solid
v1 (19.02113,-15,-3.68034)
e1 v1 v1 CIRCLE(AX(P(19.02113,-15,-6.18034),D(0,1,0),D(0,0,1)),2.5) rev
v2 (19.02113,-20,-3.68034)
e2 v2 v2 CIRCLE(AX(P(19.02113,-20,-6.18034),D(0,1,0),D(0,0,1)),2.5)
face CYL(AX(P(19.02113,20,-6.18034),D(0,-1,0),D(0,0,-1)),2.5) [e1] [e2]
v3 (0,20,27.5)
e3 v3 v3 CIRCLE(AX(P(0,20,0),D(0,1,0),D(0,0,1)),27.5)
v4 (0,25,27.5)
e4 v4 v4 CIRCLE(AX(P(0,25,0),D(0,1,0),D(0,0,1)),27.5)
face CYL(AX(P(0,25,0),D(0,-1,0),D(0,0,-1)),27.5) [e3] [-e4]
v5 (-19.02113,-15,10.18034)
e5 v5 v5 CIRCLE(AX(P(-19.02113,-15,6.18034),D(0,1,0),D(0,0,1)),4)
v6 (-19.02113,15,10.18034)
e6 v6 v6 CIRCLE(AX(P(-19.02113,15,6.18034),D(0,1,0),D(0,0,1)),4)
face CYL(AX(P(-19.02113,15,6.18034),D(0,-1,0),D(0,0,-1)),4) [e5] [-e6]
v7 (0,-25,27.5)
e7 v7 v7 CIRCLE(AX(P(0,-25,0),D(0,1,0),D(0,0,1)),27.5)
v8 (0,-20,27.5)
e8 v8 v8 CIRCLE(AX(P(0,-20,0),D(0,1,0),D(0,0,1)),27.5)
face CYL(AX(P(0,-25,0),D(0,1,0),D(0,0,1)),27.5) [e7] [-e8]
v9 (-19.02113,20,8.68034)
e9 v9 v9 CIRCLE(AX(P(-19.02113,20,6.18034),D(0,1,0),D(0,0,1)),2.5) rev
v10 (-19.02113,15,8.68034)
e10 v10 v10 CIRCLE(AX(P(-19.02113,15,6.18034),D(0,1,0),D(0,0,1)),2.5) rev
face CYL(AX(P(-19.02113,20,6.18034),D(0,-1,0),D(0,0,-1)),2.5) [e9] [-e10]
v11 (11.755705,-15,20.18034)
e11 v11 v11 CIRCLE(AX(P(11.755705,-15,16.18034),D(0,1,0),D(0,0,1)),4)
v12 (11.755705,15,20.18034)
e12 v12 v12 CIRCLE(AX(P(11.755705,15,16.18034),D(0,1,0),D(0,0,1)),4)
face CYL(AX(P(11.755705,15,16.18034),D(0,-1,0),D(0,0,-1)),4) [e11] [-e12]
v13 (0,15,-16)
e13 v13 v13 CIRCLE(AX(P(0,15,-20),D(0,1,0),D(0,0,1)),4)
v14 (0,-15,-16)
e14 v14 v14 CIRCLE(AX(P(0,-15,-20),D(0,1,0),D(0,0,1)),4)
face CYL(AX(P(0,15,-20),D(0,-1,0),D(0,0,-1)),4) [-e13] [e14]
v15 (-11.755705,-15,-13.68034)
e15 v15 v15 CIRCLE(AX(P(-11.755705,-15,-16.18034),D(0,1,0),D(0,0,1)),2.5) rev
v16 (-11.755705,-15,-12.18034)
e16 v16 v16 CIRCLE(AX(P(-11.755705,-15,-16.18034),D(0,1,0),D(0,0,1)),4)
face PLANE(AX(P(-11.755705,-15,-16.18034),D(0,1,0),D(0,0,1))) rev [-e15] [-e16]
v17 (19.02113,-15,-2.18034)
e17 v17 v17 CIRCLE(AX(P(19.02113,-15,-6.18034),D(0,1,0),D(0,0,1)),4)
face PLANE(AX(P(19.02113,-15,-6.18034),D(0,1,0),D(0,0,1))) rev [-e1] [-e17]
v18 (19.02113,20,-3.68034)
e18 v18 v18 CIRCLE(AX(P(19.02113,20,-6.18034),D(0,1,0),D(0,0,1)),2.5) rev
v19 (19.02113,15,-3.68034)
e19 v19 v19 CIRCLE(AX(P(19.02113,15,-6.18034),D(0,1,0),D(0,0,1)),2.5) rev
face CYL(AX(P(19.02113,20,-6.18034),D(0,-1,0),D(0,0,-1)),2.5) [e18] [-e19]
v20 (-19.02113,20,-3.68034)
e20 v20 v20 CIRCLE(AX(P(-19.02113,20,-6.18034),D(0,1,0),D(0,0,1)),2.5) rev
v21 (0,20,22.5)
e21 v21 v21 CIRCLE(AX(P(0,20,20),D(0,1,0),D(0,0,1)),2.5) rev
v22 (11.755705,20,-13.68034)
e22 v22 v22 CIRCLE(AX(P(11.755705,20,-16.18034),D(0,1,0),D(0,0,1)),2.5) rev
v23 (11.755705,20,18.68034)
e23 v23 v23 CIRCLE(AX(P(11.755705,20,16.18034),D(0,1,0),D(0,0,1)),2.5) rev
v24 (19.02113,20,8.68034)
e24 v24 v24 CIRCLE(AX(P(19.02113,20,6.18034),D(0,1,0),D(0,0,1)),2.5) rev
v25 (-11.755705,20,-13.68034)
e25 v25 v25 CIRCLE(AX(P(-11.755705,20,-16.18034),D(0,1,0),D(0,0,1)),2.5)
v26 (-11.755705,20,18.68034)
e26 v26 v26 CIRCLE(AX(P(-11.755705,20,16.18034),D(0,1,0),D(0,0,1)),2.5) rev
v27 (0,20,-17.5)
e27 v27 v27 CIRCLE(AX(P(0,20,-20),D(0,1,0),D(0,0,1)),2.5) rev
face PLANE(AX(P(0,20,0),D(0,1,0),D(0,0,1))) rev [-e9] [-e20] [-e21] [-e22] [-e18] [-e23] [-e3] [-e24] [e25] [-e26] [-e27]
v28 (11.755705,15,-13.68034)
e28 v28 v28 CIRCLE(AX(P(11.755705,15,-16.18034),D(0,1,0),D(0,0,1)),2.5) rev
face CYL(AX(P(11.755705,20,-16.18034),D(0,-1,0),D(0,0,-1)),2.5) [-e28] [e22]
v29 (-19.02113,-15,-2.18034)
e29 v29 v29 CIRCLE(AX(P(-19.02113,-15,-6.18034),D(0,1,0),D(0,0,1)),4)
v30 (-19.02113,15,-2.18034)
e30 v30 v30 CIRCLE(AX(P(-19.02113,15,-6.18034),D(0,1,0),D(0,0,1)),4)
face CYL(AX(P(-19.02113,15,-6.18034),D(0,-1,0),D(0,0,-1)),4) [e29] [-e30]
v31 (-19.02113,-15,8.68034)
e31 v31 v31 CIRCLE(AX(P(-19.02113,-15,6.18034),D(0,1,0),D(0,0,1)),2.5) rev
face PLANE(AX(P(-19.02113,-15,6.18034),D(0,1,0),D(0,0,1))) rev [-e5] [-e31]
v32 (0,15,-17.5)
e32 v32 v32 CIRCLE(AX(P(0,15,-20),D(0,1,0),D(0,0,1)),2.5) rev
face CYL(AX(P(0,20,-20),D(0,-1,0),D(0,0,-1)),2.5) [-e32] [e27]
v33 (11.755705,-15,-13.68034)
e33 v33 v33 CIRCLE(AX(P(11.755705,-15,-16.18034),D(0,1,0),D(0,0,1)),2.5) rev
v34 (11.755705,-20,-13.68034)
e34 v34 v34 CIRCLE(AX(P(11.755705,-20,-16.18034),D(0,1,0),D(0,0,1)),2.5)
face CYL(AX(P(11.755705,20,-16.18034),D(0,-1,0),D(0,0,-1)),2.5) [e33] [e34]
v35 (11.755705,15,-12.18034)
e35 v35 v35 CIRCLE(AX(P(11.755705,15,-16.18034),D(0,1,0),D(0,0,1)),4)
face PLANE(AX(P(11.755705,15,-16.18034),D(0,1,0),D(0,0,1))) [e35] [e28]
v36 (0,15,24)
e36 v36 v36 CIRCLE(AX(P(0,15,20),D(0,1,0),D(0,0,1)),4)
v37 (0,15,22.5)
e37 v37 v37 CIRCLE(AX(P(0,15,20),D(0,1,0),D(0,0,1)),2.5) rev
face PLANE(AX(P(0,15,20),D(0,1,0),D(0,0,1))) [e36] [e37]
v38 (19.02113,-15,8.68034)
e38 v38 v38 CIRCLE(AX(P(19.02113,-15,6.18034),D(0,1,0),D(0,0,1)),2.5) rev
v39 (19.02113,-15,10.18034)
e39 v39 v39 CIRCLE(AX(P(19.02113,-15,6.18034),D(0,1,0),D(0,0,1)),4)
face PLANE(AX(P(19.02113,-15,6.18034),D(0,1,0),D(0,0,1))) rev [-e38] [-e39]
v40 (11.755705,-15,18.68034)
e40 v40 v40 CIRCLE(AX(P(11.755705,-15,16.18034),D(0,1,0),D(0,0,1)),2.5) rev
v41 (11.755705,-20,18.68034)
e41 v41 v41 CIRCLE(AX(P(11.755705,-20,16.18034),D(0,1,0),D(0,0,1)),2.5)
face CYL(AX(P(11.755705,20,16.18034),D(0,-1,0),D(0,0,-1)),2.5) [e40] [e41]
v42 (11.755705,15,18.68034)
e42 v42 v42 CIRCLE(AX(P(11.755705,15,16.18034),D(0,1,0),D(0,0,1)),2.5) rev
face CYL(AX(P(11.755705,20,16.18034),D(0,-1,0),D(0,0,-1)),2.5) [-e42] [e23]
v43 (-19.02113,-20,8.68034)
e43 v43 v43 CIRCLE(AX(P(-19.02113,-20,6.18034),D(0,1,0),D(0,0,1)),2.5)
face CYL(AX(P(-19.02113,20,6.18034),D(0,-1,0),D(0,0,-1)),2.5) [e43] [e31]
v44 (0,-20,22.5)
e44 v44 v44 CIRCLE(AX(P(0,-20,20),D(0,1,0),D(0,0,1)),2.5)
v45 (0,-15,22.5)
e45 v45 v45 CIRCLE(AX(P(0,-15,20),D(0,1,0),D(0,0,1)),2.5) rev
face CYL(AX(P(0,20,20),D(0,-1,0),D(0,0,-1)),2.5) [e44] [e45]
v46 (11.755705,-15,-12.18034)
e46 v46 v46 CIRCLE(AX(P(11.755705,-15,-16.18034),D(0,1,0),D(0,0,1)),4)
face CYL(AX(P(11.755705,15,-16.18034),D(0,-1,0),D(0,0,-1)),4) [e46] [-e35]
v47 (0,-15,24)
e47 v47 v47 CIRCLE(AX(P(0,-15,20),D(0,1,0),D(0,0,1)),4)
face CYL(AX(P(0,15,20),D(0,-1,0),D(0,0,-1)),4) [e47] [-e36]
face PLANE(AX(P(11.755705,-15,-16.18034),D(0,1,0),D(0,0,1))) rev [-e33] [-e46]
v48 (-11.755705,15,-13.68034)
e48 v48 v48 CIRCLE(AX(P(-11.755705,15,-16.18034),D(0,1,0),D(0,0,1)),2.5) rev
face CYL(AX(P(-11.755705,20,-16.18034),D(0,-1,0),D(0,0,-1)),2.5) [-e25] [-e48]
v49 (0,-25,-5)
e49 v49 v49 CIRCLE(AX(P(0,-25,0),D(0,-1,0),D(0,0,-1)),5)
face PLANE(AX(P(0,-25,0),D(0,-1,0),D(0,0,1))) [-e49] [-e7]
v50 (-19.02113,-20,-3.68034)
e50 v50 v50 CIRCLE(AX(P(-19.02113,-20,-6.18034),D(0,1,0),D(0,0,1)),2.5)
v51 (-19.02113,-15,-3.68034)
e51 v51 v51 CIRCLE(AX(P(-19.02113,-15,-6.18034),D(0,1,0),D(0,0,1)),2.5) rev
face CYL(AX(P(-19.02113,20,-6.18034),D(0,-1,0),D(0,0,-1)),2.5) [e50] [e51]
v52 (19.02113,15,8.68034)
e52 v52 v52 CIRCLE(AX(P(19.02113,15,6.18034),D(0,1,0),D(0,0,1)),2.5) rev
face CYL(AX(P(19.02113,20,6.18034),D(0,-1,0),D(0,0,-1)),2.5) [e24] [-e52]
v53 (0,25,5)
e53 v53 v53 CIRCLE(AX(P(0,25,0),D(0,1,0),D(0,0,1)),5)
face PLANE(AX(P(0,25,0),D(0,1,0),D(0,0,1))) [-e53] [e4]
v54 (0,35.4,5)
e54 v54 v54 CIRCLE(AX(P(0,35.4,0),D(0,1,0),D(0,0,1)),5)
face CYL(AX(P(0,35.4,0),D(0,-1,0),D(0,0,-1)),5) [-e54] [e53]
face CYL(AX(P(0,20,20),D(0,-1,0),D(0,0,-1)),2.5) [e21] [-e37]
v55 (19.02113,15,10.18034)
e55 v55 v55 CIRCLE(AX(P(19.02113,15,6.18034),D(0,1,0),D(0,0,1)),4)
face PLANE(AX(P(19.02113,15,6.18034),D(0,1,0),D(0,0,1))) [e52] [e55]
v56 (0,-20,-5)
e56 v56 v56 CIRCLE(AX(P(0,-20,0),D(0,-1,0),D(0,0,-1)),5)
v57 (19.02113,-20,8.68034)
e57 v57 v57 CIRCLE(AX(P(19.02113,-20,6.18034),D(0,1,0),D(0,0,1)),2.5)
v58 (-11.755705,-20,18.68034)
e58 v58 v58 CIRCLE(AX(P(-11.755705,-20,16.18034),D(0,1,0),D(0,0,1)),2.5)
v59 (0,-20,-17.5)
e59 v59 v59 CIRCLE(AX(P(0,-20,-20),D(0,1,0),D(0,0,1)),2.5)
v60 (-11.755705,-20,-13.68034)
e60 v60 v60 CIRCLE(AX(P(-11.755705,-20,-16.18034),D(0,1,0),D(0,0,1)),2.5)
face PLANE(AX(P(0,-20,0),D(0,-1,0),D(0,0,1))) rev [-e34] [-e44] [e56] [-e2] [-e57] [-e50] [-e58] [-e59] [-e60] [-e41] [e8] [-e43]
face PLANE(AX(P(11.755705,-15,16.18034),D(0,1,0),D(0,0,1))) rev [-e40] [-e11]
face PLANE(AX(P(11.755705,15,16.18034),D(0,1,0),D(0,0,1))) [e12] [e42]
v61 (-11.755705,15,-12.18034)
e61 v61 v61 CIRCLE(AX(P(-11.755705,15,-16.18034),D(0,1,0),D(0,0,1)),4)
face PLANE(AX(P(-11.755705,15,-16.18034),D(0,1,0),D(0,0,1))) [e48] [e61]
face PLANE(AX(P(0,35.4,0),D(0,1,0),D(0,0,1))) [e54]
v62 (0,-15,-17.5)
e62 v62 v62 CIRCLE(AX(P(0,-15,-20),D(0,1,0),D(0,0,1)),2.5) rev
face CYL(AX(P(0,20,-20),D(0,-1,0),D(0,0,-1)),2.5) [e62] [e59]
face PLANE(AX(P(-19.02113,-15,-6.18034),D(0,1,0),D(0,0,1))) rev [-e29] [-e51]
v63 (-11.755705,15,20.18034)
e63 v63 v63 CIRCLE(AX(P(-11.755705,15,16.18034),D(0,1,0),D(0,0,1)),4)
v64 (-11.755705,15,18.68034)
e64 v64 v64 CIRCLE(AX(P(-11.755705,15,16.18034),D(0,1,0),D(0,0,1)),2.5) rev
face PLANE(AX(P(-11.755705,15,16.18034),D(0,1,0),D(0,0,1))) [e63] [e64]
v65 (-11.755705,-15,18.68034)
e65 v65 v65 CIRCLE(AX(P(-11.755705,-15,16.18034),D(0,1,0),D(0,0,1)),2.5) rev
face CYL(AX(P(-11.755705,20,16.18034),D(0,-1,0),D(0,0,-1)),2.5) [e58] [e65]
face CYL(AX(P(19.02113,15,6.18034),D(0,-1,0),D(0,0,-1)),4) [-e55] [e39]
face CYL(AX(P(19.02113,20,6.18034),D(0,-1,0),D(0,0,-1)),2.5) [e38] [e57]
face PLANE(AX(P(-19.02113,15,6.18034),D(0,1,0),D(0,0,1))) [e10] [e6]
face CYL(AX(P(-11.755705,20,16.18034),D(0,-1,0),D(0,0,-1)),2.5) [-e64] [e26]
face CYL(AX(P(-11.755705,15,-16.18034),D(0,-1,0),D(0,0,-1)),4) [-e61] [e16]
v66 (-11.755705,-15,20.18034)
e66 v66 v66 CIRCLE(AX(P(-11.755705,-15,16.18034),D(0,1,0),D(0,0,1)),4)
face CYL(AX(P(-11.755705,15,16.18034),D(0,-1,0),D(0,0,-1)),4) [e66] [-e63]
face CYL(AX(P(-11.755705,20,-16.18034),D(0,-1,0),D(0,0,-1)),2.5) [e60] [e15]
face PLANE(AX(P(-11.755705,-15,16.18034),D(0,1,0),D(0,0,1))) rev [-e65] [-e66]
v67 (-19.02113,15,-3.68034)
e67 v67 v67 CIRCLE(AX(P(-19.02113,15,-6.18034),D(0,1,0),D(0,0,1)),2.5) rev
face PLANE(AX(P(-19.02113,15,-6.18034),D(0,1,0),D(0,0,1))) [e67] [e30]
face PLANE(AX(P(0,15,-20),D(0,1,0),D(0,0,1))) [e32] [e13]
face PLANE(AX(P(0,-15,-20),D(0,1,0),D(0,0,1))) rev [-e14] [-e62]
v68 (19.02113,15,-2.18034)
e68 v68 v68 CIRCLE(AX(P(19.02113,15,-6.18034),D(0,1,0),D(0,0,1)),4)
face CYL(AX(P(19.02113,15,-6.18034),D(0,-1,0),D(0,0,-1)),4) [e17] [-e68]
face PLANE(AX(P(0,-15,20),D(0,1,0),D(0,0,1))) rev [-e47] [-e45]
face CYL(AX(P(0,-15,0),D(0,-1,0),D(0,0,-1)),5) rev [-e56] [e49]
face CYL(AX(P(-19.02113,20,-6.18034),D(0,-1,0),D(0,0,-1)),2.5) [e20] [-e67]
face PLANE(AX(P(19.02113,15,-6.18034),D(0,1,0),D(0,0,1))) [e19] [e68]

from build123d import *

# Parameters (mm, degrees)
STOCK_PART1_1_START       = -15
STOCK_PART1_1_OUTLINE_R   = 4
STOCK_PART1_1_DEPTH       = 30
STOCK_PART1_1_START_2     = -25
STOCK_PART1_1_2_OUTLINE_R = 27.5
STOCK_PART1_1_2_DEPTH     = 5
STOCK_PART1_1_START_3     = 20
STOCK_PART1_1_3_OUTLINE_R = 27.5
STOCK_PART1_1_3_DEPTH     = 5
STOCK_PART1_1_START_4     = -20
STOCK_PART1_1_4_OUTLINE_R = 2.5
STOCK_PART1_1_4_DEPTH     = 40
SKETCH1_R                 = 5
CUT_EXTRUDE1_DEPTH        = 10
SKETCH2_R                 = 5
BOSS_EXTRUDE1_DEPTH       = 10.4


# Read off the part's stored shape, not the designer's step: Stock-Part1-1
with BuildPart() as part:
    # Stock-Part1-1 outline → Stock-Part1-1 (new body)
    with BuildSketch(Plane(origin=(0, 0, 0), x_dir=(1, 0, 0), z_dir=(0, 1, 0)).offset(STOCK_PART1_1_START)):
        with Locations((-11.755705046, 16.180339887)):
            Circle(STOCK_PART1_1_OUTLINE_R)
        with Locations((0, 20)):
            Circle(STOCK_PART1_1_OUTLINE_R)
        with Locations((11.755705046, 16.180339887)):
            Circle(STOCK_PART1_1_OUTLINE_R)
        with Locations((19.021130326, 6.180339887)):
            Circle(STOCK_PART1_1_OUTLINE_R)
        with Locations((19.021130326, -6.180339887)):
            Circle(STOCK_PART1_1_OUTLINE_R)
        with Locations((11.755705046, -16.180339887)):
            Circle(STOCK_PART1_1_OUTLINE_R)
        with Locations((0, -20)):
            Circle(STOCK_PART1_1_OUTLINE_R)
        with Locations((-11.755705046, -16.180339887)):
            Circle(STOCK_PART1_1_OUTLINE_R)
        with Locations((-19.021130326, -6.180339887)):
            Circle(STOCK_PART1_1_OUTLINE_R)
        with Locations((-19.021130326, 6.180339887)):
            Circle(STOCK_PART1_1_OUTLINE_R)
    extrude(amount=STOCK_PART1_1_DEPTH)



with BuildPart() as body_2:
    # Stock-Part1-1 2 outline → Stock-Part1-1 2 (new body)
    with BuildSketch(Plane(origin=(0, 0, 0), x_dir=(1, 0, 0), z_dir=(0, 1, 0)).offset(STOCK_PART1_1_START_2)):
        Circle(STOCK_PART1_1_2_OUTLINE_R)
    extrude(amount=STOCK_PART1_1_2_DEPTH)


with BuildPart() as body_3:
    # Stock-Part1-1 3 outline → Stock-Part1-1 3 (new body)
    with BuildSketch(Plane(origin=(0, 0, 0), x_dir=(1, 0, 0), z_dir=(0, 1, 0)).offset(STOCK_PART1_1_START_3)):
        Circle(STOCK_PART1_1_3_OUTLINE_R)
    extrude(amount=STOCK_PART1_1_3_DEPTH)


with BuildPart() as part_1:
    add(part.part)

    add(body_2.part)  # Stock-Part1-1 4 merges body 2

    add(body_3.part)  # Stock-Part1-1 4 merges body 3
    # Stock-Part1-1 4 outline → Stock-Part1-1 4 (add)
    with BuildSketch(Plane(origin=(0, 0, 0), x_dir=(1, 0, 0), z_dir=(0, 1, 0)).offset(STOCK_PART1_1_START_4)):
        with Locations((-11.755705046, 16.180339887)):
            Circle(STOCK_PART1_1_4_OUTLINE_R)
        with Locations((0, 20)):
            Circle(STOCK_PART1_1_4_OUTLINE_R)
        with Locations((11.755705046, 16.180339888)):
            Circle(STOCK_PART1_1_4_OUTLINE_R)
        with Locations((19.021130326, 6.180339888)):
            Circle(STOCK_PART1_1_4_OUTLINE_R)
        with Locations((19.021130326, -6.180339887)):
            Circle(STOCK_PART1_1_4_OUTLINE_R)
        with Locations((11.755705046, -16.180339887)):
            Circle(STOCK_PART1_1_4_OUTLINE_R)
        with Locations((0, -20)):
            Circle(STOCK_PART1_1_4_OUTLINE_R)
        with Locations((-11.755705046, -16.180339888)):
            Circle(STOCK_PART1_1_4_OUTLINE_R)
        with Locations((-19.021130326, -6.180339888)):
            Circle(STOCK_PART1_1_4_OUTLINE_R)
        with Locations((-19.021130326, 6.180339887)):
            Circle(STOCK_PART1_1_4_OUTLINE_R)
    extrude(amount=STOCK_PART1_1_4_DEPTH)

    # Sketch1 → Cut-Extrude1 (cut)
    with BuildSketch(Plane.XZ.offset(25)):
        with Locations(Location((0, 0, 0), (0, 0, 270))):
            Circle(SKETCH1_R)
    extrude(amount=-CUT_EXTRUDE1_DEPTH, mode=Mode.SUBTRACT)

    # Sketch2 → Boss-Extrude1 (add)
    with BuildSketch(Plane(origin=(0, 25, 0), x_dir=(1, 0, 0), z_dir=(0, 1, 0))):
        with Locations(Location((0, 0, 0), (0, 0, 90))):
            Circle(SKETCH2_R)
    extrude(amount=BOSS_EXTRUDE1_DEPTH)


solid = part_1.part
